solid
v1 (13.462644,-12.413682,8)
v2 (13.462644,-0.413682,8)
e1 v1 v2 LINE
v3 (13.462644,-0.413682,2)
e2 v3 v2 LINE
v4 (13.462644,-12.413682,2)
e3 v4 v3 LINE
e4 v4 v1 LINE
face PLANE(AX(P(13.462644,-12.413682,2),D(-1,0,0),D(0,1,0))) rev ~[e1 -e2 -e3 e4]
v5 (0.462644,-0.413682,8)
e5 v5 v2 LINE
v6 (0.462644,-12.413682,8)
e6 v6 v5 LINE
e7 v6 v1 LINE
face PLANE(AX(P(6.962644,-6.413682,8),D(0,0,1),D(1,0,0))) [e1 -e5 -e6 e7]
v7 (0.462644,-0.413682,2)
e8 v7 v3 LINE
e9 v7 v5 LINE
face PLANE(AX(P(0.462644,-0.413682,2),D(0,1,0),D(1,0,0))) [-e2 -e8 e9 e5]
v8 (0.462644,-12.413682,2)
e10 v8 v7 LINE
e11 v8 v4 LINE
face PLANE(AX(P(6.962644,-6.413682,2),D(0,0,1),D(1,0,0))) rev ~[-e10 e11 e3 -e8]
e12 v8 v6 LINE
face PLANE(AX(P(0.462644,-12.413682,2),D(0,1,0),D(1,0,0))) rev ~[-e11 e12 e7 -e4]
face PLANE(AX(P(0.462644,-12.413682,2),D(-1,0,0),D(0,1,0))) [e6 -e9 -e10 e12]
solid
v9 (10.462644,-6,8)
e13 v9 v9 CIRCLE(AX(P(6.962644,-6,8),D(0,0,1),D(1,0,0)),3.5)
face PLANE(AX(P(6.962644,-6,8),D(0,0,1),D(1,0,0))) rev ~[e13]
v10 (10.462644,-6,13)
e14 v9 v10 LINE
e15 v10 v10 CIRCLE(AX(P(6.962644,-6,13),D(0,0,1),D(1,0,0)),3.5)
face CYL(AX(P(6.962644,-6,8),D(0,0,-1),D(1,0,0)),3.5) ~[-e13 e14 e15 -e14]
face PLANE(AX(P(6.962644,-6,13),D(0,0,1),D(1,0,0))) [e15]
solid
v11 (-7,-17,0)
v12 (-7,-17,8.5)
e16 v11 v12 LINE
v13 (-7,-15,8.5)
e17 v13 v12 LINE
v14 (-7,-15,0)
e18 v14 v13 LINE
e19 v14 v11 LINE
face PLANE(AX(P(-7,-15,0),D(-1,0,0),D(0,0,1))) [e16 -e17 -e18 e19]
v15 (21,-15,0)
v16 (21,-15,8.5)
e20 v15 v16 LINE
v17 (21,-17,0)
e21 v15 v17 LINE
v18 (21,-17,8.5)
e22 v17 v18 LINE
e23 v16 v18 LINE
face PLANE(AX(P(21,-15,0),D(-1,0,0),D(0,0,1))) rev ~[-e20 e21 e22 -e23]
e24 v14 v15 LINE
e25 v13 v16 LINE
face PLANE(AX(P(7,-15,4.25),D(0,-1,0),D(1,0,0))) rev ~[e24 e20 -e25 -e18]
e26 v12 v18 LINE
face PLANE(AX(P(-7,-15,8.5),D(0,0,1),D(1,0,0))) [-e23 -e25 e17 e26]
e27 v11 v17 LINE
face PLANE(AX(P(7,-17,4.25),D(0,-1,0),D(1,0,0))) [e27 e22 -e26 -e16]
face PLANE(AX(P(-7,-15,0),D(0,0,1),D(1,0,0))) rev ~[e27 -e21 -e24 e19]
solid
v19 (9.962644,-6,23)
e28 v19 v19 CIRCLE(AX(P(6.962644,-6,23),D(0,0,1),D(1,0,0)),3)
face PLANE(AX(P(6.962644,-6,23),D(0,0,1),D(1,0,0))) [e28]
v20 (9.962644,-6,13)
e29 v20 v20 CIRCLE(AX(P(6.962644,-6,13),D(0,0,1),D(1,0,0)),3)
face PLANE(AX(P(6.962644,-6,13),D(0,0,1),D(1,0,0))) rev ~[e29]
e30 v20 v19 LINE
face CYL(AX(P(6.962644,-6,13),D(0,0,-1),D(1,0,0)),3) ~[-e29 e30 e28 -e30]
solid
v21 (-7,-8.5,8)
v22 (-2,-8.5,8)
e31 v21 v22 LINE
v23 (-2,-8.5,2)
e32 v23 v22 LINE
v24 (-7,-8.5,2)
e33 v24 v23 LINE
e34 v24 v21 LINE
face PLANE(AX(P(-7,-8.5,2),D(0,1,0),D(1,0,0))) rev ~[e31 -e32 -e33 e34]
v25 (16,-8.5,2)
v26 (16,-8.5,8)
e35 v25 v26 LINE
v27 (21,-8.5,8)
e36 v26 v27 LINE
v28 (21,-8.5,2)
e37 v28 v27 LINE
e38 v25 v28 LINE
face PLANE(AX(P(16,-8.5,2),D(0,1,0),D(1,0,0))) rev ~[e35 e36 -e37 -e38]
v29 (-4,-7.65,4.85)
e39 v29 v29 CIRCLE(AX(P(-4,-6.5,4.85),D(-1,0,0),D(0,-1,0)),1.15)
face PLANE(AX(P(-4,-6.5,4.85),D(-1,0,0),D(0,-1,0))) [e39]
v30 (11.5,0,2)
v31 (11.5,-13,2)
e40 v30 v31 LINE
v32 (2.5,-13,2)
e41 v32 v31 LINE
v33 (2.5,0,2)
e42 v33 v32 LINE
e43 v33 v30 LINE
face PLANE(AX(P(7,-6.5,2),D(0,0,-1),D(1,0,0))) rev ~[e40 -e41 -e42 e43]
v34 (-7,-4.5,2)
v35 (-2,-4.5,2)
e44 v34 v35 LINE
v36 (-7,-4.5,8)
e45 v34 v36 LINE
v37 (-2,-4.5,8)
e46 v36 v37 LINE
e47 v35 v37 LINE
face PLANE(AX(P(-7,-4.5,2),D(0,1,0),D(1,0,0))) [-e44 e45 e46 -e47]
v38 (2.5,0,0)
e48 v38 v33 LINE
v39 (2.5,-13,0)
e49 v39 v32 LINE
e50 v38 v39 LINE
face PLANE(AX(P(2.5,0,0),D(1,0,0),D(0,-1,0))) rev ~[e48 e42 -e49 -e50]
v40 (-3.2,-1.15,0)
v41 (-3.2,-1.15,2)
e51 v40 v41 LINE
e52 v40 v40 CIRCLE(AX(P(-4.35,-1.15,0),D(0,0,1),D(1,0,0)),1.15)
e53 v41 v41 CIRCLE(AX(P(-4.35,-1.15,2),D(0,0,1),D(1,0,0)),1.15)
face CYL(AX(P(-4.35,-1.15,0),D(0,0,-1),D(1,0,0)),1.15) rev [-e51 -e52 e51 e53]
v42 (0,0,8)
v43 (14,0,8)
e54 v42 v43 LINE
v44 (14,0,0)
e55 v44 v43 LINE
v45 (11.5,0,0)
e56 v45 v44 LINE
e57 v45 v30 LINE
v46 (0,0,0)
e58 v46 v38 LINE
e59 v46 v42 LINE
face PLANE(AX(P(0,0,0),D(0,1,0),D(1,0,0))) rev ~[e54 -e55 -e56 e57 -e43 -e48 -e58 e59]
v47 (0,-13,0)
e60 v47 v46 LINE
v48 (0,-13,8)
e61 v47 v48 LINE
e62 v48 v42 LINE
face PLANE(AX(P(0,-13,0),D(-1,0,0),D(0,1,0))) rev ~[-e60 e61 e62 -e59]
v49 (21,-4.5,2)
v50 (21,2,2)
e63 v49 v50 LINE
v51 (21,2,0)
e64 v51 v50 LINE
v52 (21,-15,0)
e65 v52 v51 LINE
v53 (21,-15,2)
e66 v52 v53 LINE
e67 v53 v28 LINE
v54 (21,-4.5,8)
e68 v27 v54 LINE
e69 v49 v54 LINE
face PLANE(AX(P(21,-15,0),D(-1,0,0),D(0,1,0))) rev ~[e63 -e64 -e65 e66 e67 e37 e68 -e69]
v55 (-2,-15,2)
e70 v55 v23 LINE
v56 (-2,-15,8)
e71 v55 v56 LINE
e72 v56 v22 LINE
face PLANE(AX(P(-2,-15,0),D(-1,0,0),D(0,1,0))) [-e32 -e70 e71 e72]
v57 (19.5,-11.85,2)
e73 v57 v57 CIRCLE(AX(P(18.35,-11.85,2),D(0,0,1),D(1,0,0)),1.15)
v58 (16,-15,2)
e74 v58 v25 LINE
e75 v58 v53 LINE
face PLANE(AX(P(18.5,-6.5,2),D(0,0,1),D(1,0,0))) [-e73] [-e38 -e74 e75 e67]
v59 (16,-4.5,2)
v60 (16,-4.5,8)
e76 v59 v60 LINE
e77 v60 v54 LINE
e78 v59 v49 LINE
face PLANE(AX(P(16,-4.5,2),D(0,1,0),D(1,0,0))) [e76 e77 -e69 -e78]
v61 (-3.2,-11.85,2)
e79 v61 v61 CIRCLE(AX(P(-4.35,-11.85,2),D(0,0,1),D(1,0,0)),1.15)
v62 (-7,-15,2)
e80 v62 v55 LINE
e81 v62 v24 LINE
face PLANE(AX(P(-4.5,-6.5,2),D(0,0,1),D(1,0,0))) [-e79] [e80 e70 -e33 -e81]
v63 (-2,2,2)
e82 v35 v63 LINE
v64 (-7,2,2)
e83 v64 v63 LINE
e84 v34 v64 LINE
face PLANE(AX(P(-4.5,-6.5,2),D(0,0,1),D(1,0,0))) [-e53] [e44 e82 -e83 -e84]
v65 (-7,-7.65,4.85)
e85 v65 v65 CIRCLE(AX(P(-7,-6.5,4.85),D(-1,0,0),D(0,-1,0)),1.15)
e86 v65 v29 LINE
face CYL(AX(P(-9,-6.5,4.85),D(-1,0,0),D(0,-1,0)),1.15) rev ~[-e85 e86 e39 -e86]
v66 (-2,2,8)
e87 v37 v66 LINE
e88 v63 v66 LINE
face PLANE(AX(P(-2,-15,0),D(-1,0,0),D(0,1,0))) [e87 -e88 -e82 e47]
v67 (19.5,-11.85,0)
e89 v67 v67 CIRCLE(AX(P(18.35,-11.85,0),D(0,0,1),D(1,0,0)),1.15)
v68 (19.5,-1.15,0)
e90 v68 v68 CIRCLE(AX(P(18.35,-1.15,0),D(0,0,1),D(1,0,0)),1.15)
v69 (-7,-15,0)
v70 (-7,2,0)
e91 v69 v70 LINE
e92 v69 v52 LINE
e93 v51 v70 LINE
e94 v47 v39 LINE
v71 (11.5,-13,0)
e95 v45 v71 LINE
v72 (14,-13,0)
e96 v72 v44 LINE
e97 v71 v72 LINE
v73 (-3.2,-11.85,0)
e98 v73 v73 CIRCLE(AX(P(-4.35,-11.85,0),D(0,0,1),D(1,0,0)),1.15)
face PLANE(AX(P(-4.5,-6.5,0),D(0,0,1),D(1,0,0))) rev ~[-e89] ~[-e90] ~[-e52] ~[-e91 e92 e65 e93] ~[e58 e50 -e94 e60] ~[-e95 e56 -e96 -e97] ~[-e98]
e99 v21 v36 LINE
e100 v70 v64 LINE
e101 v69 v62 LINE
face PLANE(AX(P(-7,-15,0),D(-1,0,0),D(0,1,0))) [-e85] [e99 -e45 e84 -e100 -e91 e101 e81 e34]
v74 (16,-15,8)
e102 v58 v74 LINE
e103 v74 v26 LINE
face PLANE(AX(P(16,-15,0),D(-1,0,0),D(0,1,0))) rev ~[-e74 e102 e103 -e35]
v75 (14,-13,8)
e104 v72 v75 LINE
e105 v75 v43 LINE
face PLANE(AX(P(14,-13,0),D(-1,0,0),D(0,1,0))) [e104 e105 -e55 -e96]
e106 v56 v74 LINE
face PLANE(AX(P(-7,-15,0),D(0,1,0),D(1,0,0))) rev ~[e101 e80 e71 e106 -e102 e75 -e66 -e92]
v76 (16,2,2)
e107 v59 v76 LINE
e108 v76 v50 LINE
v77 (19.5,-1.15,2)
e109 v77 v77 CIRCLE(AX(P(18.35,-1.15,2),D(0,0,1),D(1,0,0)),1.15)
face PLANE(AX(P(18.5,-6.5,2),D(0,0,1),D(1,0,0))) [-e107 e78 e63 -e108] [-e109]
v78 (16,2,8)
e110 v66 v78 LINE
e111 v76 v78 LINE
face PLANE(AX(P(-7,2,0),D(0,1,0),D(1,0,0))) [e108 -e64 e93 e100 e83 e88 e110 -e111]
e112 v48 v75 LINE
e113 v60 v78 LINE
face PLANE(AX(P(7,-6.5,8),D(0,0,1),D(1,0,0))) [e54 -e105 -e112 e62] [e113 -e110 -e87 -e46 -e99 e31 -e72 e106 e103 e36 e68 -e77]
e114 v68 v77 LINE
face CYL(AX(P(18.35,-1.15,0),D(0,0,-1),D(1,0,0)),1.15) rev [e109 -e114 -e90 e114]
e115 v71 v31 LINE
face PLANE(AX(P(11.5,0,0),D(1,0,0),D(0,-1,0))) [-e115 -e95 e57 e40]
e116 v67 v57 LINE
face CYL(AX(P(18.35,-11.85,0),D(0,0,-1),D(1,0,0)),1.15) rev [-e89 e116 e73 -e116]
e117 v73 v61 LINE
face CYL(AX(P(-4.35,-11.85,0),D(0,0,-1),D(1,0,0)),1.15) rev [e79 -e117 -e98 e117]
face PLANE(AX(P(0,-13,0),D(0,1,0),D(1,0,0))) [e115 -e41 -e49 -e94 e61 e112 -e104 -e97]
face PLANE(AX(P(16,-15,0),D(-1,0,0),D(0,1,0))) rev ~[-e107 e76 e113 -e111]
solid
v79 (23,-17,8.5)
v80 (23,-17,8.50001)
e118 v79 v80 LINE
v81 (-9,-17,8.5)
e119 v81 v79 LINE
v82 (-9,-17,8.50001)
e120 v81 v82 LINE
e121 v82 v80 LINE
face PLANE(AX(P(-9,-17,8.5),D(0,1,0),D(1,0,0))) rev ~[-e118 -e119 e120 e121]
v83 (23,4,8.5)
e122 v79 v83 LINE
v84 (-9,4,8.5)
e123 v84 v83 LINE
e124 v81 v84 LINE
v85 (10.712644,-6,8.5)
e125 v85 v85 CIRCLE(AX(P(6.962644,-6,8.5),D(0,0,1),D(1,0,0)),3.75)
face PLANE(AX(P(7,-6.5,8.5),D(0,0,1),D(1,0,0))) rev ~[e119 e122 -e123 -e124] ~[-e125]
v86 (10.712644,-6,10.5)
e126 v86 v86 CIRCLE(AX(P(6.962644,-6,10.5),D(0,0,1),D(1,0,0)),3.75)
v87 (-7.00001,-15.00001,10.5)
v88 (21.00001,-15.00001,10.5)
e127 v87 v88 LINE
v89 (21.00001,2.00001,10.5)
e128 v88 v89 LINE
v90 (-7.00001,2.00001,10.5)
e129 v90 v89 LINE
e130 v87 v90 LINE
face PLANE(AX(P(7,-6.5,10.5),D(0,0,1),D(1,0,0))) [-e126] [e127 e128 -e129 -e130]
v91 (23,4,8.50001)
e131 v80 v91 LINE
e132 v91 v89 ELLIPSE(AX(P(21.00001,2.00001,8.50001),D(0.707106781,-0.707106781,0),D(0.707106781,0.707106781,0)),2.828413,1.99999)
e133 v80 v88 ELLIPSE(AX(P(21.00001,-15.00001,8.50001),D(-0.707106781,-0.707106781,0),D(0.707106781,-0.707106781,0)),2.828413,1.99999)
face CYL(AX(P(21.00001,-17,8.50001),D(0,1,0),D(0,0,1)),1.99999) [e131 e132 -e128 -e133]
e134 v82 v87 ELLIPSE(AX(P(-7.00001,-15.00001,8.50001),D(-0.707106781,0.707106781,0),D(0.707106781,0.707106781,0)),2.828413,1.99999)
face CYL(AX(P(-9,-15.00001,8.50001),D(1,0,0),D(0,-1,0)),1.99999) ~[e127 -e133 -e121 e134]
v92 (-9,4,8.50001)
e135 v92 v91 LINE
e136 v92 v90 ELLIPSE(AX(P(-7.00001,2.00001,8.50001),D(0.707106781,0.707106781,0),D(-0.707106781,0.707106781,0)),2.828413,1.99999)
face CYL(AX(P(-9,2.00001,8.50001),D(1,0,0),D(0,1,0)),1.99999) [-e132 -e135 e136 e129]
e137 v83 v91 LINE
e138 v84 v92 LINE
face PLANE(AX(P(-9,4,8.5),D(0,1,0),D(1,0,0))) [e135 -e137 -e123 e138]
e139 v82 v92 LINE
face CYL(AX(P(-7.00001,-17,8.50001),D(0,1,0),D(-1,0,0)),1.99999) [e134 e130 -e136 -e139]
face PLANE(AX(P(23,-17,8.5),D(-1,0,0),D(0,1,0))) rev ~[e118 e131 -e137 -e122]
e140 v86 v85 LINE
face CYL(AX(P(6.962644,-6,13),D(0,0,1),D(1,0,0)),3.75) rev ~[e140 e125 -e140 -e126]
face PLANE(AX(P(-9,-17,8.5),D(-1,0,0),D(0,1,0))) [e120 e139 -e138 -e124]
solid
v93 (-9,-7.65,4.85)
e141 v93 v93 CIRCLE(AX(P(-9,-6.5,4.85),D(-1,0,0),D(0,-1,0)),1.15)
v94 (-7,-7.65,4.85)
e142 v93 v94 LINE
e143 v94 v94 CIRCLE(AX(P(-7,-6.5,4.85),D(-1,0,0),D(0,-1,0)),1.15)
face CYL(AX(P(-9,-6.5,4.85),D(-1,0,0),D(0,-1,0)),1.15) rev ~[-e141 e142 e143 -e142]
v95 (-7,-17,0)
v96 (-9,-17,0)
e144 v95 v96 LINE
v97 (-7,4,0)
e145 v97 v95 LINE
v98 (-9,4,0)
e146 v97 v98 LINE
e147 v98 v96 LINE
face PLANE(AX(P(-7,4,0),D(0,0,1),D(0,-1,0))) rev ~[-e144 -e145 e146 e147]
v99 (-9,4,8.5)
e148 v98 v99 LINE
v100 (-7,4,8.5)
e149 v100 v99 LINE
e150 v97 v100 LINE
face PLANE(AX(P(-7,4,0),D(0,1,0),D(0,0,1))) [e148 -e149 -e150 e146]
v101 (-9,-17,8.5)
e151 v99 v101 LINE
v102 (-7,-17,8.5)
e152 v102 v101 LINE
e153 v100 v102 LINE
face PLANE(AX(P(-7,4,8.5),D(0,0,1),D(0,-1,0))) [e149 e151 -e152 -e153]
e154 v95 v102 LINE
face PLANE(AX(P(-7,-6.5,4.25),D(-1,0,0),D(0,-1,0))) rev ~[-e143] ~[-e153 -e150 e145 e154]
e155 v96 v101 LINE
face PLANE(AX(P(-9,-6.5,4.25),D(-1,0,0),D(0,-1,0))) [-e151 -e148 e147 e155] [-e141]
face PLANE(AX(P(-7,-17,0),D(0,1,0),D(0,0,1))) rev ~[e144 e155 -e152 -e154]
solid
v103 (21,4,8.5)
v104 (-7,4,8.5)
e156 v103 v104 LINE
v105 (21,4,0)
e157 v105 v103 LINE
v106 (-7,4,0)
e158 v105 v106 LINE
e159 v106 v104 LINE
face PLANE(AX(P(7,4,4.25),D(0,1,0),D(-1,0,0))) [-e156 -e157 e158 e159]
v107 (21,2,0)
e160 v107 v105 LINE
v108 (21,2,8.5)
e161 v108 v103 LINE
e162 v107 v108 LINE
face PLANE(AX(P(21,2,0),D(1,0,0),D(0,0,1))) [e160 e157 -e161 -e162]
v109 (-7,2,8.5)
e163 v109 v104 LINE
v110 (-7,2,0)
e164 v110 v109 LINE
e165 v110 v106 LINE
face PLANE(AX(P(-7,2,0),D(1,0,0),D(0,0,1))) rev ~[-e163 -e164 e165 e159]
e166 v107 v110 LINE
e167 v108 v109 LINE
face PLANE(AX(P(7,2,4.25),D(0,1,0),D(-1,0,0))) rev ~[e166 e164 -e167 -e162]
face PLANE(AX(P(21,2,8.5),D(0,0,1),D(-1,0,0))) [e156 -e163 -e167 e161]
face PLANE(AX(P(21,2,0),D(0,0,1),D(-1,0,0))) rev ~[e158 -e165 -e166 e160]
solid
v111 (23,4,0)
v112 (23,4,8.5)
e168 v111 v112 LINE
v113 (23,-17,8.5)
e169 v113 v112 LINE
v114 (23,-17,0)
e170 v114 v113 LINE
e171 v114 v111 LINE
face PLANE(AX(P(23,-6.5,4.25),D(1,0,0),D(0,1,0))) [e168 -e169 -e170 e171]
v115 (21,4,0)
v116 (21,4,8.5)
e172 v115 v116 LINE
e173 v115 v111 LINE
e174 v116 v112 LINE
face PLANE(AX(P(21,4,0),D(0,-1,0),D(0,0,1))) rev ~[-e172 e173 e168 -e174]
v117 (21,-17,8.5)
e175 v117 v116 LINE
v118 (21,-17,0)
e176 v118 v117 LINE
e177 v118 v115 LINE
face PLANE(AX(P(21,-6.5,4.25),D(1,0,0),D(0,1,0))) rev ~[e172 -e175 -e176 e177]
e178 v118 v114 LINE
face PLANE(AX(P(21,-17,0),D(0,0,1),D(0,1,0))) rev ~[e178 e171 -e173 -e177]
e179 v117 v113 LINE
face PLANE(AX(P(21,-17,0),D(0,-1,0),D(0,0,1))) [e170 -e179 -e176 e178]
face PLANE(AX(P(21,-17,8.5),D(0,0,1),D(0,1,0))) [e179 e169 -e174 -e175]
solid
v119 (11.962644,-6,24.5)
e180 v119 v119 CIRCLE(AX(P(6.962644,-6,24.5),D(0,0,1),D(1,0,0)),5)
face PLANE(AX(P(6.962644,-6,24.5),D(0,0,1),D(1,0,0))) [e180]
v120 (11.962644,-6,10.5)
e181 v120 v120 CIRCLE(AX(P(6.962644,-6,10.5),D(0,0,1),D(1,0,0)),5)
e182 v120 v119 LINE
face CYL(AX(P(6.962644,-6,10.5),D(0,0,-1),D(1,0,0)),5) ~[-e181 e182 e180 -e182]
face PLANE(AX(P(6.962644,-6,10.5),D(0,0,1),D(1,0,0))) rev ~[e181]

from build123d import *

# Parameters (mm, degrees)
F0_W      = 18
F0_H      = 17
F0_W_2    = 14
F0_H_2    = 13
F1_DEPTH  = 8
F2_W      = 9
F2_H      = 13
F3_DEPTH  = 2
F5_W      = 13
F5_H      = 12
F6_DEPTH  = 6
F7_R      = 3.5
F8_DEPTH  = 5
F9_R      = 3
F10_DEPTH = 10
F11_W     = 5
F11_H     = 17
F11_R     = 1.15
F12_DEPTH = 2
F13_W     = 5
F13_H     = 4
F14_DEPTH = 6
F15_W     = 28
F15_H     = 8.5
F16_DEPTH = 2
F17_W     = 21
F17_H     = 8.5
F18_DEPTH = 2
F19_W     = 28
F19_H     = 8.5
F20_DEPTH = 2
F21_W     = 21
F21_H     = 8.5
F22_DEPTH = 2
F23_R     = 1.15
F24_DEPTH = 5
F25_W     = 32
F25_H     = 21
F26_DEPTH = 2
F27_R     = 3.75
F28_DEPTH = 5
F29_R     = 5
F30_DEPTH = 14
F31_R     = 1.99999


# Not quite as in the source:
# - a fillet or chamfer is up to 0.001 mm smaller than in the source, because OpenCascade refuses the exact size


with BuildPart() as f1:
    # F0 (on Top) → F1 (new body)
    with BuildSketch(Plane.XY):
        with Locations((7, -6.5)):
            Rectangle(F0_W, F0_H)
        with Locations((7, -6.5)):
            Rectangle(F0_W_2, F0_H_2, mode=Mode.SUBTRACT)
    extrude(amount=F1_DEPTH)

    # F2 (on face) → F3 (join)
    with BuildSketch(Plane(origin=(0, 0, 0), x_dir=(1, 0, 0), z_dir=(0, 0, -1))):
        with Locations((7, 6.5)):
            Rectangle(F2_W, F2_H)
    extrude(amount=-F3_DEPTH)

    # F11 (on Top) → F12 (join)
    with BuildSketch(Plane.XY):
        with Locations((-4.5, -6.5)):
            Rectangle(F11_W, F11_H)
        with Locations((-4.35, -11.85)):
            Circle(F11_R, mode=Mode.SUBTRACT)
        with Locations((-4.35, -1.15)):
            Circle(F11_R, mode=Mode.SUBTRACT)
        with Locations((18.5, -6.5)):
            Rectangle(F11_W, F11_H)
        with Locations((18.35, -11.85)):
            Circle(F11_R, mode=Mode.SUBTRACT)
        with Locations((18.35, -1.15)):
            Circle(F11_R, mode=Mode.SUBTRACT)
    extrude(amount=F12_DEPTH)

    # F13 (on face) → F14 (join)
    with BuildSketch(Plane.XY.offset(2)):
        with Locations((-4.5, -6.5)):
            Rectangle(F13_W, F13_H)
        with Locations((18.5, -6.5)):
            Rectangle(F13_W, F13_H)
    extrude(amount=F14_DEPTH)


with BuildPart() as f6:
    # F5 (on face) → F6 (new body)
    with BuildSketch(Plane.XY.offset(2)):
        with Locations((6.9626439363, -6.4136818983)):
            Rectangle(F5_W, F5_H)
    extrude(amount=F6_DEPTH)


with BuildPart() as f8:
    # F7 (on face) → F8 (new body)
    with BuildSketch(Plane.XY.offset(8)):
        with Locations((6.9626439363, -6)):
            Circle(F7_R)
    extrude(amount=F8_DEPTH)


with BuildPart() as f10:
    # F9 (on face) → F10 (new body)
    with BuildSketch(Plane.XY.offset(13)):
        with Locations((6.9626439363, -6)):
            Circle(F9_R)
    extrude(amount=F10_DEPTH)


with BuildPart() as f16:
    # F15 (on face) → F16 (new body)
    with BuildSketch(Plane.XZ.offset(15)):
        with Locations((7, 4.25)):
            Rectangle(F15_W, F15_H)
    extrude(amount=F16_DEPTH)


with BuildPart() as f18:
    # F17 (on face) → F18 (new body)
    with BuildSketch(Plane.YZ.offset(21)):
        with Locations((-6.5, 4.25)):
            Rectangle(F17_W, F17_H)
    extrude(amount=F18_DEPTH)


with BuildPart() as f20:
    # F19 (on face) → F20 (new body)
    with BuildSketch(Plane(origin=(0, 2, 0), x_dir=(-1, 0, 0), z_dir=(0, 1, 0))):
        with Locations((-7, 4.25)):
            Rectangle(F19_W, F19_H)
    extrude(amount=F20_DEPTH)


with BuildPart() as f22:
    # F21 (on face) → F22 (new body)
    with BuildSketch(Plane(origin=(-7, 0, 0), x_dir=(0, -1, 0), z_dir=(-1, 0, 0))):
        with Locations((6.5, 4.25)):
            Rectangle(F21_W, F21_H)
    extrude(amount=F22_DEPTH)


with BuildPart() as f24_tool:
    # F23 (on face) → F24 (new body)
    with BuildSketch(Plane(origin=(-9, 0, 0), x_dir=(0, -1, 0), z_dir=(-1, 0, 0))):
        with Locations((6.5, 4.85)):
            Circle(F23_R)
    extrude(amount=-F24_DEPTH)


with BuildPart() as f1_1:
    add(f1.part)

    # F24: cut by f24_tool
    add(f24_tool.part, mode=Mode.SUBTRACT)


with BuildPart() as f22_1:
    add(f22.part)

    # F24: cut by f24_tool
    add(f24_tool.part, mode=Mode.SUBTRACT)


with BuildPart() as f26:
    # F25 (on face) → F26 (new body)
    with BuildSketch(Plane.XY.offset(8.5)):
        with Locations((7, -6.5)):
            Rectangle(F25_W, F25_H)
    extrude(amount=F26_DEPTH)

    # F27 (on face) → F28 (cut)
    with BuildSketch(Plane.XY.offset(13)):
        with Locations((6.9626439363, -6)):
            Circle(F27_R)
    extrude(amount=-F28_DEPTH, mode=Mode.SUBTRACT)

    # F31 (radius 2 in the source; OpenCascade refuses exactly that, so slightly less here)
    f31_edges = [f26.edges().sort_by_distance(p)[0] for p in [
        (-9, -6.5, 10.5),
        (7, 4, 10.5),
        (7, -17, 10.5),
        (23, -6.5, 10.5),
    ]]
    fillet(f31_edges, radius=F31_R)


with BuildPart() as f30:
    # F29 (on face) → F30 (new body)
    with BuildSketch(Plane.XY.offset(10.5)):
        with Locations((6.9626439363, -6)):
            Circle(F29_R)
    extrude(amount=F30_DEPTH)


solid = Compound([f6.part, f8.part, f10.part, f16.part, f18.part, f20.part, f1_1.part, f22_1.part, f26.part, f30.part])
